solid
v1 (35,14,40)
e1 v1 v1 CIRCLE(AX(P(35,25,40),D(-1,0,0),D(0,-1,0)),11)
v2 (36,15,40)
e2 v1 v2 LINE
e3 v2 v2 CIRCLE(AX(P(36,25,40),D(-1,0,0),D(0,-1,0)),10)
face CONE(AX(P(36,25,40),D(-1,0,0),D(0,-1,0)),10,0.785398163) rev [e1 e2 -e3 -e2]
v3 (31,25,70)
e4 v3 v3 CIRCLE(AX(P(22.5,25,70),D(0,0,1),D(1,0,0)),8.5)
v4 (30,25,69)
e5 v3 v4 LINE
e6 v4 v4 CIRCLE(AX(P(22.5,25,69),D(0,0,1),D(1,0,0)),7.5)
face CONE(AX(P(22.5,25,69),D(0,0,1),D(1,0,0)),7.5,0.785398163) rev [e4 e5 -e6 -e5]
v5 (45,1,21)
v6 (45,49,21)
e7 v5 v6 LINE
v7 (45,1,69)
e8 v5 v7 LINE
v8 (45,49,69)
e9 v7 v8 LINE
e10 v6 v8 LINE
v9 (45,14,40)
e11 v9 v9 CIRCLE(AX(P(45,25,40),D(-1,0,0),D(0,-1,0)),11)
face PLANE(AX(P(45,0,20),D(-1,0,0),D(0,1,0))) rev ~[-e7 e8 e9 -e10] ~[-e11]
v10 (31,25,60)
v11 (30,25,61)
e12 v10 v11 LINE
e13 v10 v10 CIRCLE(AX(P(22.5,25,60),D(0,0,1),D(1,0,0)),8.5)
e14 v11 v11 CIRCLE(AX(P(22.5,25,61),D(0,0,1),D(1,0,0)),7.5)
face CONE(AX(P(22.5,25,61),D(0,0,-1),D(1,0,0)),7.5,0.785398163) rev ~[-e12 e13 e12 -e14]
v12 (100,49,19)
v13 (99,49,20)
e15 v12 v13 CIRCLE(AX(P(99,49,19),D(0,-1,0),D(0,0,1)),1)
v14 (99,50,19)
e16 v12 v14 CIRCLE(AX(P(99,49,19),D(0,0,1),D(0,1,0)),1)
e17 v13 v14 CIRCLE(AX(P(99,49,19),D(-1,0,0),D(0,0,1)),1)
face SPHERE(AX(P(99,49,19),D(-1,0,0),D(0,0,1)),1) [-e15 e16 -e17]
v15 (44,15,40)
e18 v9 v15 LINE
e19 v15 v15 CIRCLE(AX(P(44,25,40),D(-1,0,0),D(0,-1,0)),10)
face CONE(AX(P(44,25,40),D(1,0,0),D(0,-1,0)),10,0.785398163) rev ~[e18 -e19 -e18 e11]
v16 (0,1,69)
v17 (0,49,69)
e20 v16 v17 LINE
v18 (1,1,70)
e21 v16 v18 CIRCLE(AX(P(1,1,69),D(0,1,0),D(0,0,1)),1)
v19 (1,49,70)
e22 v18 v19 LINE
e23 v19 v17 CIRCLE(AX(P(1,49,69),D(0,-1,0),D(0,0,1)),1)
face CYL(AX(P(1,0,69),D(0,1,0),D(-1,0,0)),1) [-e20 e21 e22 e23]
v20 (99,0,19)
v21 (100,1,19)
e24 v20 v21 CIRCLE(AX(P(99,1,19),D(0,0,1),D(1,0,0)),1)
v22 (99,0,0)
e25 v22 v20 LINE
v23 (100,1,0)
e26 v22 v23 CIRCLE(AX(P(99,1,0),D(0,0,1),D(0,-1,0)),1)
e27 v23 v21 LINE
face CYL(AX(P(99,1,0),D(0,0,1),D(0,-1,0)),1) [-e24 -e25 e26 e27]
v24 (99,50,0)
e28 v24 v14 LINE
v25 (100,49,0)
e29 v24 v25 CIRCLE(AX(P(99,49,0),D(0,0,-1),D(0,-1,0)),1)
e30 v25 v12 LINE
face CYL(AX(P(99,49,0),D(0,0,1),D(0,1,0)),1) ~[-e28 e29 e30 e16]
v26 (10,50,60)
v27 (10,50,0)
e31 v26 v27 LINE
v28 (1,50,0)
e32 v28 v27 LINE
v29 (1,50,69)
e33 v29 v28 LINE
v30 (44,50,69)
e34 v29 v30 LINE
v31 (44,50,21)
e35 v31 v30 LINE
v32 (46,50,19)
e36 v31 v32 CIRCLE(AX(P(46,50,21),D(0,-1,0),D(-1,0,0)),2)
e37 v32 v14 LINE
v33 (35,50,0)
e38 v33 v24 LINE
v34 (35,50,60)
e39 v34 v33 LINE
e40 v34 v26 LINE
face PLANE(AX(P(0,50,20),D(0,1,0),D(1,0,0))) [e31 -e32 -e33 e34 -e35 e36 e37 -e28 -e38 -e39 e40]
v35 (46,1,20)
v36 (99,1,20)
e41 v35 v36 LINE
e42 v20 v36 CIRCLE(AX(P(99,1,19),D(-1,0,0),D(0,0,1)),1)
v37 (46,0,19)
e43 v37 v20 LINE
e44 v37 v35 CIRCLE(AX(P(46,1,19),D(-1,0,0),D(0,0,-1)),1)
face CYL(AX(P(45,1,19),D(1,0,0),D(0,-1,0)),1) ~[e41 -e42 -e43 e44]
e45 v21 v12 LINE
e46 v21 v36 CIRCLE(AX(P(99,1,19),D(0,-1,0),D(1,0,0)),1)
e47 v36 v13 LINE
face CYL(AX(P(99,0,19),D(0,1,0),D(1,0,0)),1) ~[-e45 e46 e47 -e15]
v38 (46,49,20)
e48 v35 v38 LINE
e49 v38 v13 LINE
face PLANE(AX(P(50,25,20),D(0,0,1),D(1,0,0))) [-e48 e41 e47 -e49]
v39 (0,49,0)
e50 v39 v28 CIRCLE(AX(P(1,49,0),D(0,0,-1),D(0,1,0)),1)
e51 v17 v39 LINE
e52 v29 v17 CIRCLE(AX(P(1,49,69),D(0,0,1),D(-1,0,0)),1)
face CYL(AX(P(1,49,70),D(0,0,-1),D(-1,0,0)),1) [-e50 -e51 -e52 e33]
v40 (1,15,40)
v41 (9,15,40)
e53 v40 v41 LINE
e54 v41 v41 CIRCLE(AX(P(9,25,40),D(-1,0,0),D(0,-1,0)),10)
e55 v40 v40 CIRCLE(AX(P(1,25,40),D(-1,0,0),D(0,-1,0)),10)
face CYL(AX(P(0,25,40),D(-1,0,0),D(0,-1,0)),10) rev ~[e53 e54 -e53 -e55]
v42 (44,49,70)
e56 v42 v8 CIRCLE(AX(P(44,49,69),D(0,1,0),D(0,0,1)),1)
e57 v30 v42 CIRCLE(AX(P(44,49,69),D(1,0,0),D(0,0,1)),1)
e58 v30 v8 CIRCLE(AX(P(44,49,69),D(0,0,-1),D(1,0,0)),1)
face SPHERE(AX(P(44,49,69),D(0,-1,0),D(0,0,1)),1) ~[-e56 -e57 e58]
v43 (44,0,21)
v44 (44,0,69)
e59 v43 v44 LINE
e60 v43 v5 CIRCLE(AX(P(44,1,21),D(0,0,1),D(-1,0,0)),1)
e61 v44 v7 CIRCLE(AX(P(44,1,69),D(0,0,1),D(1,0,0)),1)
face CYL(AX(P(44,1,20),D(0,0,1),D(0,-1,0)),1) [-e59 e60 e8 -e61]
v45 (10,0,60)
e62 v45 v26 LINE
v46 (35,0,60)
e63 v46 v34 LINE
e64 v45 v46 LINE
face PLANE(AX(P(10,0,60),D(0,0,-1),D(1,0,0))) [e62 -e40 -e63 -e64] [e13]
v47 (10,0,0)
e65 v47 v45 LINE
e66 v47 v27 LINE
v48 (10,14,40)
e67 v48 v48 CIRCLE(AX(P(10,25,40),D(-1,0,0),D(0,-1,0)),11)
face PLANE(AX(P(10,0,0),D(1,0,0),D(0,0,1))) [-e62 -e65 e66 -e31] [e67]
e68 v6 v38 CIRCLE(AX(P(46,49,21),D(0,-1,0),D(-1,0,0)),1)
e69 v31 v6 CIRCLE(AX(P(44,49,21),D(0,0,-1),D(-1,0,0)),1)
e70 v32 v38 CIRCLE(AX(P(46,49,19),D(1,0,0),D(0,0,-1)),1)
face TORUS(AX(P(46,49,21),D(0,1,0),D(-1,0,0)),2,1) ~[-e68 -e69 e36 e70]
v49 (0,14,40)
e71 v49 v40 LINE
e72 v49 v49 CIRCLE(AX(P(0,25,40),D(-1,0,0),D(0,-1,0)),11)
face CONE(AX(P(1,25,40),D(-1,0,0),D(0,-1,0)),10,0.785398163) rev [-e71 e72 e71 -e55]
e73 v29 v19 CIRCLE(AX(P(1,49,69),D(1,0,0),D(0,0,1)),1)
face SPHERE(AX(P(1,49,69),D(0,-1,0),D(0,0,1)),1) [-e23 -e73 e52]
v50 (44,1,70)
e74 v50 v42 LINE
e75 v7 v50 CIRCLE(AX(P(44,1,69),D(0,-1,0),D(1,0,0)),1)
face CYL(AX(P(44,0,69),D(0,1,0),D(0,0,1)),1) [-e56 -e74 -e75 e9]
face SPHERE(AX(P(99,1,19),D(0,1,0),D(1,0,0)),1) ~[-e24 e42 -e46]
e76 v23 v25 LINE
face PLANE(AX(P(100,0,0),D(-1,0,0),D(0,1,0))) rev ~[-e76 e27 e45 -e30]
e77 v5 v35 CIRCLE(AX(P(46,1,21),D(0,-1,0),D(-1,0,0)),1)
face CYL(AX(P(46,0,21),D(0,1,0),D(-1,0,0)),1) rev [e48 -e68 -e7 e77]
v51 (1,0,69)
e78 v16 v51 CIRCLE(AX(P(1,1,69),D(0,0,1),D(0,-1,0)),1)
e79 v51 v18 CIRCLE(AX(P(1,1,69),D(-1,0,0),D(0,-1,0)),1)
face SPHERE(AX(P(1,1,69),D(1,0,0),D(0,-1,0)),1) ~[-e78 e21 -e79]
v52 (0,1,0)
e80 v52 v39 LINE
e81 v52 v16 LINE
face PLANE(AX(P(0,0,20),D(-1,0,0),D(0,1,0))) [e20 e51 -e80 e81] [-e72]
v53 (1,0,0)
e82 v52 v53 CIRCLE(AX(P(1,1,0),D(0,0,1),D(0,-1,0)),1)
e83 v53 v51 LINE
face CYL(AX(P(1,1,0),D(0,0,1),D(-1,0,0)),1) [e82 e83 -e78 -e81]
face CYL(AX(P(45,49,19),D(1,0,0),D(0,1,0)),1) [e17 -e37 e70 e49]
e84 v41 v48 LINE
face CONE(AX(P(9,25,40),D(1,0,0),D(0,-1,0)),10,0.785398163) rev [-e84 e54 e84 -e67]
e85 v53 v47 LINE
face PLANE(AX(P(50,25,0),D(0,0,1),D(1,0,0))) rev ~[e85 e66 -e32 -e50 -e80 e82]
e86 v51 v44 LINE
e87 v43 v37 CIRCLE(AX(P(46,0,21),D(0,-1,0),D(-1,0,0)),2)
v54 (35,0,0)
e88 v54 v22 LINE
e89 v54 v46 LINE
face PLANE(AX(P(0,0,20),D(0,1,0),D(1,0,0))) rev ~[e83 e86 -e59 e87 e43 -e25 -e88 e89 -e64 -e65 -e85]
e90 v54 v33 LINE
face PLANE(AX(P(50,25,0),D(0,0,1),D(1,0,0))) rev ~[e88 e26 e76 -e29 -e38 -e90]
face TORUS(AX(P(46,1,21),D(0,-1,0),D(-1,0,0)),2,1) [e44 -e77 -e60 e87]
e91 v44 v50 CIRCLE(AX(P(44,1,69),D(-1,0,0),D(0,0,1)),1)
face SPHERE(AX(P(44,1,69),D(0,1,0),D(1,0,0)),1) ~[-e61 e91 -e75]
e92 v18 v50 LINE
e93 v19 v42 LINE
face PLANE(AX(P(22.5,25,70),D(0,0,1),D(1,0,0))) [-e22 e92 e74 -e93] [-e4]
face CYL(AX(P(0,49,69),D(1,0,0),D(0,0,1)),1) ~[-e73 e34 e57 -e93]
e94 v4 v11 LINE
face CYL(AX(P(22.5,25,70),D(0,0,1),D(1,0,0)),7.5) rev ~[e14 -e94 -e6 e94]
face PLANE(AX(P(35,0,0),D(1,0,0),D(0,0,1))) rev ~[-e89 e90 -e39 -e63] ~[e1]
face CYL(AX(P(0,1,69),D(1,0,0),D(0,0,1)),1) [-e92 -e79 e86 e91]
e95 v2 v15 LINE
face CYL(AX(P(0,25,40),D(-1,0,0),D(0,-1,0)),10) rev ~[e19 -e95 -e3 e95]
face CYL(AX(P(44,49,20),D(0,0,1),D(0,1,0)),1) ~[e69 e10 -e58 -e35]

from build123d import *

# Parameters (mm, degrees)
F0_W     = 100
F0_H     = 50
F1_DEPTH = 20
F2_W     = 45
F2_H     = 50
F3_DEPTH = 50
F4_W     = 25
F4_H     = 60
F5_DEPTH = 50.001
F6_R     = 10
F7_DEPTH = 45
F8_R     = 7.5
F9_DEPTH = 10
F10_R    = 1
F11_SIZE = 1


with BuildPart() as f1:
    # F0 (on Top) → F1 (new body)
    with BuildSketch(Plane.XY):
        with Locations((50, 25)):
            Rectangle(F0_W, F0_H)
    extrude(amount=F1_DEPTH)

    # F2 (on face) → F3 (join)
    with BuildSketch(Plane.XY.offset(20)):
        with Locations((22.5, 25)):
            Rectangle(F2_W, F2_H)
    extrude(amount=F3_DEPTH)

    # F4 (on face) → F5 (cut, through all)
    with BuildSketch(Plane.XZ):
        with Locations((22.5, 30)):
            Rectangle(F4_W, F4_H)
    extrude(amount=-F5_DEPTH, mode=Mode.SUBTRACT)

    # F6 (on face) → F7 (cut, through all)
    with BuildSketch(Plane(origin=(0, 0, 0), x_dir=(0, -1, 0), z_dir=(-1, 0, 0))):
        with Locations((-25, 40)):
            Circle(F6_R)
    extrude(amount=-F7_DEPTH, mode=Mode.SUBTRACT)

    # F8 (on face) → F9 (cut, through all)
    with BuildSketch(Plane.XY.offset(70)):
        with Locations((22.5, 25)):
            Circle(F8_R)
    extrude(amount=-F9_DEPTH, mode=Mode.SUBTRACT)

    # F10
    f10_edges = [f1.edges().sort_by_distance(p)[0] for p in [
        (45, 25, 70),
        (45, 25, 20),
        (45, 0, 45),
        (22.5, 0, 70),
        (0, 0, 35),
        (0, 25, 70),
        (22.5, 50, 70),
        (45, 50, 45),
        (72.5, 50, 20),
        (100, 25, 20),
        (0, 50, 35),
        (100, 0, 10),
        (100, 50, 10),
        (72.5, 0, 20),
    ]]
    fillet(f10_edges, radius=F10_R)

    # F11
    f11_edges = [f1.edges().sort_by_distance(p)[0] for p in [
        (45, 35, 40),
        (10, 35, 40),
        (35, 35, 40),
        (0, 35, 40),
        (15, 25, 70),
        (15, 25, 60),
    ]]
    chamfer(f11_edges, length=F11_SIZE)


solid = f1.part
